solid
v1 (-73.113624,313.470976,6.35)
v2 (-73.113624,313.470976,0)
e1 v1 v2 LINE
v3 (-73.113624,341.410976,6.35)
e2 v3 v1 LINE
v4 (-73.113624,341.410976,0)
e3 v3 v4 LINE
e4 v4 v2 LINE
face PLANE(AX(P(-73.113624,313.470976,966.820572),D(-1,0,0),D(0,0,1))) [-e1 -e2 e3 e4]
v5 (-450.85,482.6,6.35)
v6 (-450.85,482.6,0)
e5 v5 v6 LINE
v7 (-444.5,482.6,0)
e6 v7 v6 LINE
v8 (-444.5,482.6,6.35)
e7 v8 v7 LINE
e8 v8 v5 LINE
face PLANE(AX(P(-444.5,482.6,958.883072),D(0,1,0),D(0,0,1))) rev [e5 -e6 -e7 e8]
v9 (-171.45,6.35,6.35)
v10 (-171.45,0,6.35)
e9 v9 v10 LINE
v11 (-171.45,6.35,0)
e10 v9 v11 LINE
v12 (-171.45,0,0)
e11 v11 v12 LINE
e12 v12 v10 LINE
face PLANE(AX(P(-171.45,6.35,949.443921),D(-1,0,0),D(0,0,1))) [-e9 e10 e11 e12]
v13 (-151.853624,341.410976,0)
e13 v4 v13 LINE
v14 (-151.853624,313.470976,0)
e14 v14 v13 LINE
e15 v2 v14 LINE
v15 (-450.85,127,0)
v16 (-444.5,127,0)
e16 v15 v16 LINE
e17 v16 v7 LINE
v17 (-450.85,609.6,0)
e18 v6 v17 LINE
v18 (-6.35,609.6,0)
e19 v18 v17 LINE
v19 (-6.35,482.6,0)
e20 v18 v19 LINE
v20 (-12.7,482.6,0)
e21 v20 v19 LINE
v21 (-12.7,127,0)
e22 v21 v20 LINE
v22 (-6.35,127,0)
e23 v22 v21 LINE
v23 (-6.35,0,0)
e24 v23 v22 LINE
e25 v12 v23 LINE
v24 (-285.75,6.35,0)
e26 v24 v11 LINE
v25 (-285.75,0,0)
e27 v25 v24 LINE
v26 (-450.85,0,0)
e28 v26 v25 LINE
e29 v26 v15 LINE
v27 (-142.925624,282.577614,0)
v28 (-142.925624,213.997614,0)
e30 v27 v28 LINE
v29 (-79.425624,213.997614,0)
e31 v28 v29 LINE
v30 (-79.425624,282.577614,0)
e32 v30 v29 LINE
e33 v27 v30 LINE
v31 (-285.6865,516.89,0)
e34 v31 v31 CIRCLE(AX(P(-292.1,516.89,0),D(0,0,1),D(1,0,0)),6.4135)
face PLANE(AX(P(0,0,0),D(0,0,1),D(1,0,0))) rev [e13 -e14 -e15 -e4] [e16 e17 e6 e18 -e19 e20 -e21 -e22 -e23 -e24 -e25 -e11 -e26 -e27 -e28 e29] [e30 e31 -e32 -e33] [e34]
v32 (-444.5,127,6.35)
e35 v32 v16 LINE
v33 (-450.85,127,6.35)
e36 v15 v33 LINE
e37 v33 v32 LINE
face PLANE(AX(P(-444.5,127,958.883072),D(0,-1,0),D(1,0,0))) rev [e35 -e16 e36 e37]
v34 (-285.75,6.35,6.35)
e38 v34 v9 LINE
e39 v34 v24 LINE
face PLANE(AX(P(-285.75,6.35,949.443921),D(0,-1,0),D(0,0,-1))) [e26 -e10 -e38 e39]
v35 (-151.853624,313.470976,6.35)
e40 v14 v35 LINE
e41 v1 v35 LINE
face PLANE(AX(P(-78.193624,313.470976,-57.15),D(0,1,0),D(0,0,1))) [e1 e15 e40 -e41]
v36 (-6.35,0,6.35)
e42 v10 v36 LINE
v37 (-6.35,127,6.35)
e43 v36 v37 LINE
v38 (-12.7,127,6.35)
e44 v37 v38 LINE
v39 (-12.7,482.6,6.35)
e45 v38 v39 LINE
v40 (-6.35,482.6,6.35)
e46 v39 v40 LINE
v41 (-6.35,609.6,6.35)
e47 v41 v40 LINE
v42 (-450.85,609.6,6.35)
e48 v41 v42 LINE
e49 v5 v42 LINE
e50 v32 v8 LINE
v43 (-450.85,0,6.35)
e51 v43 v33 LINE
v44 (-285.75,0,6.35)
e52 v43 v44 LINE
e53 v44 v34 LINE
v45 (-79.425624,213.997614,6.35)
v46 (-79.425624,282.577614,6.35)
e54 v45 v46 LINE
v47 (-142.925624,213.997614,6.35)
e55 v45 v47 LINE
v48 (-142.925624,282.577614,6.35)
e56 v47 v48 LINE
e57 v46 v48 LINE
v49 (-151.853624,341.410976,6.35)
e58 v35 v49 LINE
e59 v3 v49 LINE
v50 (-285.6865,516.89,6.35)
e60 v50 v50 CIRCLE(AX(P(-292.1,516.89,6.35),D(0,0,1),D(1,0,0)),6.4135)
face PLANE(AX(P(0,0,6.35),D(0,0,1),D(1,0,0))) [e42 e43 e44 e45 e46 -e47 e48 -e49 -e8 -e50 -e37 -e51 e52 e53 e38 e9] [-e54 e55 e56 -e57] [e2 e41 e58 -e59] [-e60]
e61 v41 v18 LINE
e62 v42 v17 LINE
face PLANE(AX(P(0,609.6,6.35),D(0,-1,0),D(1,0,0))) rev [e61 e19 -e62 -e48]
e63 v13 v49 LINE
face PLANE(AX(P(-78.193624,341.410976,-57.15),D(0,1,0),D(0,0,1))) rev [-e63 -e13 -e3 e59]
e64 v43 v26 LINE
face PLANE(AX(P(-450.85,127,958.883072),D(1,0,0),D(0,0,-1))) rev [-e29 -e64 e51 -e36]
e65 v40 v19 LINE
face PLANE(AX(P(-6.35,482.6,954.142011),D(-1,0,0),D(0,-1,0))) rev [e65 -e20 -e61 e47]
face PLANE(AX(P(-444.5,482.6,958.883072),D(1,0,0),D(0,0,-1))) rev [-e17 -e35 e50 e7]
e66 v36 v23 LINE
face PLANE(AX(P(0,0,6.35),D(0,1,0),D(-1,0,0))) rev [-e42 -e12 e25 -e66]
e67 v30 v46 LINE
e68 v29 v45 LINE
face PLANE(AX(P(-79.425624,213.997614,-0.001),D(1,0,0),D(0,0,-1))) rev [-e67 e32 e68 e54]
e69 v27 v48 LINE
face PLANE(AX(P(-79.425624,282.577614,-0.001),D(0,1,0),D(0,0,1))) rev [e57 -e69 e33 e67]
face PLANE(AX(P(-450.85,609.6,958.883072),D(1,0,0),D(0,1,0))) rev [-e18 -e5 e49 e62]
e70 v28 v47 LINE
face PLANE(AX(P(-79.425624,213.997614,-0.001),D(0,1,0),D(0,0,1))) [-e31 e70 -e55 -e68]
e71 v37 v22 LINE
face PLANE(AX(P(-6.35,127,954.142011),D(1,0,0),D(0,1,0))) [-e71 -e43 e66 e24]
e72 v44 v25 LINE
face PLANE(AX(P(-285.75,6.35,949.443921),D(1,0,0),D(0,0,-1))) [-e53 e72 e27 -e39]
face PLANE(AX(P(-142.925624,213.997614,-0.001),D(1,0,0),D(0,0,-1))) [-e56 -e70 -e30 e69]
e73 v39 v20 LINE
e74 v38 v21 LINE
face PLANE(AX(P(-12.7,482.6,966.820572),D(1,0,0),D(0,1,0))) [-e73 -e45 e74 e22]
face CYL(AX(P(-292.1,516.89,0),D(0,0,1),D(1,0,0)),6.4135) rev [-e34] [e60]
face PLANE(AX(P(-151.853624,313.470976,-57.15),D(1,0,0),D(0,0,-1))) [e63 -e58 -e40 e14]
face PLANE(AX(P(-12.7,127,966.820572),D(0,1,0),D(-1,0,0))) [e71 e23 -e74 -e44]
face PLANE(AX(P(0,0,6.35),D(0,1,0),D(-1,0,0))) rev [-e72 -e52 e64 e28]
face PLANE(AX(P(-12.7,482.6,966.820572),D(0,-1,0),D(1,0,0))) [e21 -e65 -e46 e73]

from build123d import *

# Parameters (mm, degrees)
SKETCH1_W                = 457.2
SKETCH1_H                = 609.6
BOSS_EXTRUDE2_DEPTH      = 6.35
CUT_EXTRUDE1_REACH       = 764.026
SKETCH2_W                = 63.5
SKETCH2_H                = 68.58
SKETCH3_W                = 73.66
SKETCH3_H                = 27.94
CUT_EXTRUDE2_DEPTH       = 63.5
CUT_EXTRUDE4_DEPTH       = 763.026457874
CUT_EXTRUDE4_DEPTH_BACK  = 763.026457874
SKETCH5_W                = 5.08
SKETCH5_H                = 27.94
CUT_EXTRUDE5_DEPTH       = 763.026457874
CUT_EXTRUDE5_DEPTH_BACK  = 763.026457874
CUT_EXTRUDE6_DEPTH       = 763.026457874
CUT_EXTRUDE6_DEPTH_BACK  = 763.026457874
SKETCH7_W                = 12.7
SKETCH7_H                = 355.6
CUT_EXTRUDE8_START       = -6.35
CUT_EXTRUDE8_OUTLINE_W   = 6.35
CUT_EXTRUDE8_OUTLINE_H   = 127
CUT_EXTRUDE8_DEPTH       = 6.35
CUT_EXTRUDE9_DEPTH       = 763.026457874
CUT_EXTRUDE9_DEPTH_BACK  = 763.026457874
CUT_EXTRUDE10_START      = -6.35
CUT_EXTRUDE10_OUTLINE_W  = 6.35
CUT_EXTRUDE10_OUTLINE_H  = 127
CUT_EXTRUDE10_DEPTH      = 6.35
CUT_EXTRUDE11_DEPTH      = 759.233608461
CUT_EXTRUDE11_DEPTH_BACK = 759.233608461
CUT_EXTRUDE12_DEPTH      = 759.233608461
CUT_EXTRUDE12_DEPTH_BACK = 759.233608461
SKETCH4_R                = 6.4135
CUT_EXTRUDE13_DEPTH      = 759.233608461


# Read off the part's stored shape, not the designer's step: Cut-Extrude8, Cut-Extrude10
with BuildPart() as part:
    # Sketch1 → Boss-Extrude2 (new body)
    with BuildSketch(Plane.XY):
        with Locations((-228.6, 304.8)):
            Rectangle(SKETCH1_W, SKETCH1_H)
    extrude(amount=BOSS_EXTRUDE2_DEPTH)

    # Sketch2 → Cut-Extrude1 (cut, up to next)
    with BuildSketch(Plane.XY.offset(6.35), mode=Mode.PRIVATE) as cut_extrude1_sk1:
        with Locations((-111.175624359, 248.287614127)):
            Rectangle(SKETCH2_W, SKETCH2_H)
    cut_extrude1_tool1 = extrude(cut_extrude1_sk1.sketch, amount=-CUT_EXTRUDE1_REACH, mode=Mode.PRIVATE) & part.part
    add(cut_extrude1_tool1.solids().sort_by_distance((-111.175624, 248.287614, 6.35))[0], mode=Mode.SUBTRACT)

    # Sketch3 → Cut-Extrude2 (cut)
    with BuildSketch(Plane.XY.offset(6.35)):
        with Locations((-115.023623847, 327.440976048)):
            Rectangle(SKETCH3_W, SKETCH3_H)
    extrude(amount=-CUT_EXTRUDE2_DEPTH, mode=Mode.SUBTRACT)

    # Sketch5 → Cut-Extrude4 (cut, two sides: drawn at the far end of the back side and taken through both)
    with BuildSketch(Plane.XY.offset(6.35).offset(-CUT_EXTRUDE4_DEPTH_BACK)):
        with Locations((-75.653623847, 327.440976048)):
            Rectangle(SKETCH5_W, SKETCH5_H)
    extrude(amount=CUT_EXTRUDE4_DEPTH + CUT_EXTRUDE4_DEPTH_BACK, mode=Mode.SUBTRACT)

    # Sketch6 → Cut-Extrude5 (cut, two sides: drawn at the far end of the back side and taken through both)
    with BuildSketch(Plane.XY.offset(6.35).offset(-CUT_EXTRUDE5_DEPTH_BACK)):
        Polygon((-1796.763236556, 127), (-457.2, 127), (-444.5, 127), (-444.5, 482.6), (-457.2, 482.6), (-1796.763236556, 482.6), (-4475.889709667, 482.6), (-4475.889709667, 127), align=None)
    extrude(amount=CUT_EXTRUDE5_DEPTH + CUT_EXTRUDE5_DEPTH_BACK, mode=Mode.SUBTRACT)

    # Sketch7 → Cut-Extrude6 (cut, two sides: drawn at the far end of the back side and taken through both)
    with BuildSketch(Plane.XY.offset(6.35).offset(-CUT_EXTRUDE6_DEPTH_BACK)):
        with Locations((-6.35, 304.8)):
            Rectangle(SKETCH7_W, SKETCH7_H)
    extrude(amount=CUT_EXTRUDE6_DEPTH + CUT_EXTRUDE6_DEPTH_BACK, mode=Mode.SUBTRACT)

    # Cut-Extrude8 outline → Cut-Extrude8 (cut)
    with BuildSketch(Plane.XY.offset(6.35).offset(CUT_EXTRUDE8_START)):
        with Locations((-454.025, 63.5)):
            Rectangle(CUT_EXTRUDE8_OUTLINE_W, CUT_EXTRUDE8_OUTLINE_H)
    extrude(amount=CUT_EXTRUDE8_DEPTH, mode=Mode.SUBTRACT)

    # Sketch13 → Cut-Extrude9 (cut, two sides: drawn at the far end of the back side and taken through both)
    with BuildSketch(Plane.XY.offset(6.35).offset(-CUT_EXTRUDE9_DEPTH_BACK)):
        Polygon((-450.85, 2136.014036469), (-450.85, 609.6), (-450.85, 482.6), (-450.85, -1043.814036469), (-3503.678072938, -1043.814036469), (-3503.678072938, 2136.014036469), align=None)
    extrude(amount=CUT_EXTRUDE9_DEPTH + CUT_EXTRUDE9_DEPTH_BACK, mode=Mode.SUBTRACT)

    # Cut-Extrude10 outline → Cut-Extrude10 (cut)
    with BuildSketch(Plane.XY.offset(6.35).offset(CUT_EXTRUDE10_START)):
        with Locations((-3.175, 546.1)):
            Rectangle(CUT_EXTRUDE10_OUTLINE_W, CUT_EXTRUDE10_OUTLINE_H)
    extrude(amount=CUT_EXTRUDE10_DEPTH, mode=Mode.SUBTRACT)

    # Sketch16 → Cut-Extrude11 (cut, two sides: drawn at the far end of the back side and taken through both)
    with BuildSketch(Plane.XY.offset(6.35).offset(-CUT_EXTRUDE11_DEPTH_BACK)):
        Polygon((-6.35, 1645.896828812), (-6.35, 127), (-6.35, 0), (-6.35, -1518.896828812), (3031.443657625, -1518.896828812), (3031.443657625, 1645.896828812), align=None)
    extrude(amount=CUT_EXTRUDE11_DEPTH + CUT_EXTRUDE11_DEPTH_BACK, mode=Mode.SUBTRACT)

    # Sketch9 → Cut-Extrude12 (cut, two sides: drawn at the far end of the back side and taken through both)
    with BuildSketch(Plane.XY.offset(6.35).offset(-CUT_EXTRUDE12_DEPTH_BACK)):
        Polygon((-171.45, -1351.158484296), (-171.45, 0), (-171.45, 6.35), (-285.75, 6.35), (-285.75, 0), (-285.75, -1351.158484296), (-285.75, -4053.475452889), (-171.45, -4053.475452889), align=None)
    extrude(amount=CUT_EXTRUDE12_DEPTH + CUT_EXTRUDE12_DEPTH_BACK, mode=Mode.SUBTRACT)

    # Sketch4 → Cut-Extrude13 (cut, through all)
    with BuildSketch(Plane.XY.offset(6.35)):
        with Locations((-292.1, 516.89)):
            Circle(SKETCH4_R)
    extrude(amount=-CUT_EXTRUDE13_DEPTH, mode=Mode.SUBTRACT)


solid = part.part
